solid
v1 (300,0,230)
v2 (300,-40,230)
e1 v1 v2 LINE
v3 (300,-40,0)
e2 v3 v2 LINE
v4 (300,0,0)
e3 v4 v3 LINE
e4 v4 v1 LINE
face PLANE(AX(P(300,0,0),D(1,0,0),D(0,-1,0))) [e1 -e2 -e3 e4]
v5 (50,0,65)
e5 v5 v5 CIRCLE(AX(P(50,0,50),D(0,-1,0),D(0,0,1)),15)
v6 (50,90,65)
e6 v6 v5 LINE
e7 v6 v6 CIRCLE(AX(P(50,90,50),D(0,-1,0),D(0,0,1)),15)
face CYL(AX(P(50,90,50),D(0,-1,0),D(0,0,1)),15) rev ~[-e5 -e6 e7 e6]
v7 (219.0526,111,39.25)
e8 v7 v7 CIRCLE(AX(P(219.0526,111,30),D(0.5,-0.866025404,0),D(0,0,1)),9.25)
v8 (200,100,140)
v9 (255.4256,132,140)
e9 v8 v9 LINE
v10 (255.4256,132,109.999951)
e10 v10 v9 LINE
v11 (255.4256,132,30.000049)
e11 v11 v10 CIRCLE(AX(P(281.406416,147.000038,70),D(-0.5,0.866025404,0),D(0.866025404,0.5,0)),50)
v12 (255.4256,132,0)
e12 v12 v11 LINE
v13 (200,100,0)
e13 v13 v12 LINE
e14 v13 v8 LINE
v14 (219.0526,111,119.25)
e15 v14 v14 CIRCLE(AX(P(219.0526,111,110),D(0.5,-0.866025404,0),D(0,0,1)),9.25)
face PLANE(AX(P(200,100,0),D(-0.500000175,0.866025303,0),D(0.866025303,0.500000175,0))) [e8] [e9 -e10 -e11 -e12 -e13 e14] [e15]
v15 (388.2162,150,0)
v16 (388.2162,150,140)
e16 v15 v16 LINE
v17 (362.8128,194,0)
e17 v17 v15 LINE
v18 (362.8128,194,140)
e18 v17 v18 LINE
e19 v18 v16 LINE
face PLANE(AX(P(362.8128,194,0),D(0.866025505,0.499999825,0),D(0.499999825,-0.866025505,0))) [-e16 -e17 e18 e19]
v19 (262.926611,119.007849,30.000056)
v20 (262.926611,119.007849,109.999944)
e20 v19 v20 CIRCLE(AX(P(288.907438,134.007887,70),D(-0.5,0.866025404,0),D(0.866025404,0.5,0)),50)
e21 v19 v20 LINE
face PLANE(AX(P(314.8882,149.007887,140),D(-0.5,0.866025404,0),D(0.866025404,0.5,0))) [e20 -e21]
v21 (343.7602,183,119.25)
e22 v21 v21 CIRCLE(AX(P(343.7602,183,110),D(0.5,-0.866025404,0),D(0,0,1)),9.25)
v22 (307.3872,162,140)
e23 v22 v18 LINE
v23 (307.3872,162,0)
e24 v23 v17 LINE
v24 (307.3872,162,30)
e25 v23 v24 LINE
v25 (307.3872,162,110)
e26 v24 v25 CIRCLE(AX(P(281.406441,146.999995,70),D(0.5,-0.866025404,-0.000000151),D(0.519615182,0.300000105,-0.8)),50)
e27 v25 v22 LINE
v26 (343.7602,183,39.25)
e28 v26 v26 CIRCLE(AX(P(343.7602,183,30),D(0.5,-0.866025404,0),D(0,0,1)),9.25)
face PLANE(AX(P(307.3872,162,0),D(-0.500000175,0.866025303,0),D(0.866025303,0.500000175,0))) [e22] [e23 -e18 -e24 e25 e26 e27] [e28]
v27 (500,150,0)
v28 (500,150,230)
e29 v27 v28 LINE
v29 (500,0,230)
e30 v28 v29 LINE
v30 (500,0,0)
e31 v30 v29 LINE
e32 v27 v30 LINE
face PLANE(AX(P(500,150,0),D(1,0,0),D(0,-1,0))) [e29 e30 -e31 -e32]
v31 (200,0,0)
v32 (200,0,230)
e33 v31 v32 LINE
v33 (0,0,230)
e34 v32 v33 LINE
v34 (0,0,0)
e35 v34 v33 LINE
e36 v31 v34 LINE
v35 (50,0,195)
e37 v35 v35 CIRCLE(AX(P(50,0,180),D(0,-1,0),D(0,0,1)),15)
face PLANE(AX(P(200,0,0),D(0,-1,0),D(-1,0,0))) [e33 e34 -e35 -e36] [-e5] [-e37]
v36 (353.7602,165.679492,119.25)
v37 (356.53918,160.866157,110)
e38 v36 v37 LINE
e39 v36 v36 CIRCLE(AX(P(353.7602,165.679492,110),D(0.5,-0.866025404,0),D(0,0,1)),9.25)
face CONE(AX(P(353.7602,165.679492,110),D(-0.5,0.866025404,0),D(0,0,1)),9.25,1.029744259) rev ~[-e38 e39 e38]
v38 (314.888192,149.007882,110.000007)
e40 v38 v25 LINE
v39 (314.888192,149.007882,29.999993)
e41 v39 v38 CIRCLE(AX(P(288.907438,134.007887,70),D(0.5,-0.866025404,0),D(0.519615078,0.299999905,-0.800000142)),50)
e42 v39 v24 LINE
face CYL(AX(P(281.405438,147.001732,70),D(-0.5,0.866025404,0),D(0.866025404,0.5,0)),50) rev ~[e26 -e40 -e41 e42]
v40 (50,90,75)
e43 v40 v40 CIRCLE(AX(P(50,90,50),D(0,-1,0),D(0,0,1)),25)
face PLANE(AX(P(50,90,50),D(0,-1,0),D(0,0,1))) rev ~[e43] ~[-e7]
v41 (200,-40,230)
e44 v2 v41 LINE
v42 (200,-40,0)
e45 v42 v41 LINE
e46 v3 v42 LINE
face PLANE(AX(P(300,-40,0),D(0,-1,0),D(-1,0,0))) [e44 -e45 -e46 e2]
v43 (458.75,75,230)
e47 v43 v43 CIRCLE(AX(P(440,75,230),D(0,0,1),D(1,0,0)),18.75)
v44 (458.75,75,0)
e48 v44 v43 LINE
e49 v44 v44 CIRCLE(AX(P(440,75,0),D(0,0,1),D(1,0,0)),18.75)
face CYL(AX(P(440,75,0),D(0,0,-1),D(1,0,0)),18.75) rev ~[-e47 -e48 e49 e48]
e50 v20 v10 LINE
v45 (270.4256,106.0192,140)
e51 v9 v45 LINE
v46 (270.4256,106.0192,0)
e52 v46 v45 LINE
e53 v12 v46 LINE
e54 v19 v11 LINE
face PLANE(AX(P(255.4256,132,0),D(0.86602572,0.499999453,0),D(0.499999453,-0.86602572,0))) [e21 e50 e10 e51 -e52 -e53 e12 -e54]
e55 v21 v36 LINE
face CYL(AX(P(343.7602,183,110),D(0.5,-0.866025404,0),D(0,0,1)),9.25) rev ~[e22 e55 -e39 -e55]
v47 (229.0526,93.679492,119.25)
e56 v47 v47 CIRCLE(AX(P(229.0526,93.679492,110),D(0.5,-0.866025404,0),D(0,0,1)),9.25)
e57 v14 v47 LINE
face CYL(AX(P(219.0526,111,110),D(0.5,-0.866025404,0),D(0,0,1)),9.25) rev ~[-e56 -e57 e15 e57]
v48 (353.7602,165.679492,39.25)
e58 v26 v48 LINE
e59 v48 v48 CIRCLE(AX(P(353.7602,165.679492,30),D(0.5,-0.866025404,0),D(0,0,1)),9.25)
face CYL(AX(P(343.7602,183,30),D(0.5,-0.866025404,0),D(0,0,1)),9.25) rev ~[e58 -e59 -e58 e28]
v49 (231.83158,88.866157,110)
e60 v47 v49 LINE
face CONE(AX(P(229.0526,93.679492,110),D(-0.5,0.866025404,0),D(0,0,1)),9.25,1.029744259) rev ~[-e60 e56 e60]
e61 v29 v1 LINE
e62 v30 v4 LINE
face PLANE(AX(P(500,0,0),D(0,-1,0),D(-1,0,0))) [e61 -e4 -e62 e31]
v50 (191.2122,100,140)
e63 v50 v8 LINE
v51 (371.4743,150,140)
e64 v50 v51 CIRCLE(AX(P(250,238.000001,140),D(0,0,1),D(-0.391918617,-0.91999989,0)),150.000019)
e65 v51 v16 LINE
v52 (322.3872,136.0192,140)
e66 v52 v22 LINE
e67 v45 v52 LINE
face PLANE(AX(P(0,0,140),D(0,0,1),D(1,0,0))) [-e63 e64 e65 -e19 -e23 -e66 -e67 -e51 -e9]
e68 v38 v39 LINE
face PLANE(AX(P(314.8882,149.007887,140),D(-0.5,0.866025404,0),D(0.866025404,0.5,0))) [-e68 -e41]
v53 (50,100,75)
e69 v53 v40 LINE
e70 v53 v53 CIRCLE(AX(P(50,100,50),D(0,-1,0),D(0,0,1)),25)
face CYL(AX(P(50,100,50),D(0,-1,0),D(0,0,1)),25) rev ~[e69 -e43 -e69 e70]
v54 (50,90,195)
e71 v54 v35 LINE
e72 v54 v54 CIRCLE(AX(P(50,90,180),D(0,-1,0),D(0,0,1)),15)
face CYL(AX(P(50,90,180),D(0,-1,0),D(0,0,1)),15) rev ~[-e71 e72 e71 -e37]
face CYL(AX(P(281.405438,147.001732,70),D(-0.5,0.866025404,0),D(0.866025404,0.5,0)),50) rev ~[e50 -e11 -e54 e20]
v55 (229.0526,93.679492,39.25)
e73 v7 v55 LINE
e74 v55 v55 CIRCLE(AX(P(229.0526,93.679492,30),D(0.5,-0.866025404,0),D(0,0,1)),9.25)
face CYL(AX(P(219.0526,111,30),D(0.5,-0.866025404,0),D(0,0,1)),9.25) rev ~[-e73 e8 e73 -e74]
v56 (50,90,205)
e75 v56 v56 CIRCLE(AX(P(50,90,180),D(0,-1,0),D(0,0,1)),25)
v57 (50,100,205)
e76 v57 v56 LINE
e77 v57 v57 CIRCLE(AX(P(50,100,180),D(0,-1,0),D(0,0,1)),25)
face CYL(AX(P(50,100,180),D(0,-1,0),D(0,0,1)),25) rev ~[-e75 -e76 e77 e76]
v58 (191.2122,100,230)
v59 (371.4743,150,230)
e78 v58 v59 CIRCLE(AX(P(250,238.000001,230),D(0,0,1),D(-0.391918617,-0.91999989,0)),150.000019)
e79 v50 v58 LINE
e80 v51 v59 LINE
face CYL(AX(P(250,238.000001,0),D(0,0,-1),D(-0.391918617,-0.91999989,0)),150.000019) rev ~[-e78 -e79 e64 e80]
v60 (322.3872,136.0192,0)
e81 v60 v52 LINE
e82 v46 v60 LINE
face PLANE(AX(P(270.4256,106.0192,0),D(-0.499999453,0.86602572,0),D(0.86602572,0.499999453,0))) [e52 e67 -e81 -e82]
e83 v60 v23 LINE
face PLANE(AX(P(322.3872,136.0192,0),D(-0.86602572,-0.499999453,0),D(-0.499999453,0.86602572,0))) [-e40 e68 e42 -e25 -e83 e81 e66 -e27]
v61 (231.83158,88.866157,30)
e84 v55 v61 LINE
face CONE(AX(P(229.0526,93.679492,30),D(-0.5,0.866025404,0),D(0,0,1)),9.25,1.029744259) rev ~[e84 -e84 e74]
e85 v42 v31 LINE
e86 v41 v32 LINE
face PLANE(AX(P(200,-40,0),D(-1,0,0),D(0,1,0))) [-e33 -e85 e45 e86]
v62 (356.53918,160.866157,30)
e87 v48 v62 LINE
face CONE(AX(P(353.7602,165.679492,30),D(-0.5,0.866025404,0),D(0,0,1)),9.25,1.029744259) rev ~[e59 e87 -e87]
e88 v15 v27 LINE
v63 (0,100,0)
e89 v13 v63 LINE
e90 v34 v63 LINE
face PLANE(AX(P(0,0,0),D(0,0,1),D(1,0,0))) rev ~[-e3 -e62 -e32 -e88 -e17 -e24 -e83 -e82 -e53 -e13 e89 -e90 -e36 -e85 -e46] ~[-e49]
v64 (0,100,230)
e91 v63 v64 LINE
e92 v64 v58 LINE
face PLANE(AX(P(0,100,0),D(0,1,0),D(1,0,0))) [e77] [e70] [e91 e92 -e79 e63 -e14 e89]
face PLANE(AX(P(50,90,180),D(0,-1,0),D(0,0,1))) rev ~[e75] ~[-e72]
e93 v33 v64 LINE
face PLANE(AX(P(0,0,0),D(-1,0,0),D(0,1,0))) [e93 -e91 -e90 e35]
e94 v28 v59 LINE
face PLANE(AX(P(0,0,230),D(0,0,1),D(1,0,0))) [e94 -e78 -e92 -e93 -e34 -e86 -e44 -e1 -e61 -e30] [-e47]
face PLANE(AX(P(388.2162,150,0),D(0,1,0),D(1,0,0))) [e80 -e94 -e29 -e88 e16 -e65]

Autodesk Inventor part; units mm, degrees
ref_plane "YZ Plane" through (0, 0, 0) normal (1, 0, 0) x (0, 1, 0)
ref_plane "XZ Plane" through (0, 0, 0) normal (0, 1, 0) x (-1, 0, 0)
ref_plane "XY Plane" through (0, 0, 0) normal (0, 0, 1) x (1, 0, 0)
sketch "Sketch1" plane through (0, 0, 0) normal (0, 0, 1) x (1, 0, 0)
  line L0 (0, 0) -> (0, 100)
  line L1 (0, 100) -> (200, 100)
  line L2 (500, 150) -> (500, 0)
  line L3 (500, 0) -> (300, 0)
  line L4 (300, 0) -> (300, -40)
  line L5 (300, -40) -> (200, -40)
  line L6 (200, -40) -> (200, 0)
  line L7 (200, 0) -> (0, 0)
  circle A0 centre (440, 75) radius 18.75
  arc A1 (191.2122, 100) -> (371.4743, 150) centre (250, 238) ccw
  line L8 (371.4743, 150) -> (500, 150)
  line L9 (362.8128, 194) -> (388.2162, 150)
  line L10 (255.4256, 132) -> (270.4256, 106.0192)
  line L11 (270.4256, 106.0192) -> (322.3872, 136.0192)
  line L12 (322.3872, 136.0192) -> (307.3872, 162)
  line L13 (200, 100) -> (255.4256, 132)
  line L14 (307.3872, 162) -> (362.8128, 194)
  dimension "d0" = 100
  dimension "d2" = 200
  dimension "d3" = 100
  dimension "d4" = 40
  dimension "d5" = 150
  dimension "d6" = 75
  dimension "d7" = 60
  dimension "d8" = 37.5
  dimension "d10" = 250
  dimension "d11" = 200
  dimension "d12" = 138
  dimension "d13" = 150
  dimension "d15" = 188
  dimension "d16" = 60
  dimension "d17" = 30
  dimension "d18" = 30
  dimension "d19" = 500
extrude "Extrusion1" add sketch "Sketch1" along normal blind 230 contours L0 L1 A1 L8 L2 L3 L4 L5 L6 L7
extrude "Extrusion2" add sketch "Sketch1" along normal blind 140 contours L1 L13 L10 L11 L12 L14 L9 L8 A1
sketch "Sketch2" plane through (0, 100, 230) normal (0, 1, 0) x (1, 0, 0)
  line L0 (0, 230) -> (0, 0) projected
  line L1 (50, 180) -> (50, 50) construction
  point P0 (50, 115)
  point P1 (0, 115)
  dimension "d24" = 50
  dimension "d25" = 130
hole "Hole1" at (50, 100, 50) at (50, 100, 180) direction (0, -1, 0) diameter 30 depth 100 counterbore diameter 50 counterbore depth 10
sketch "Sketch3" plane through (307.3872, 162, 140) normal (-0.5, 0.8660254, 0) x (0.8660254, 0.5, 0)
  line L0 (64, 140) -> (64, 0) projected
  line L1 (-60, 140) -> (-124, 140) projected
  line L2 (-124, 140) -> (-124, 0) projected
  line L3 (-60, 0) -> (-124, 0) projected
  line L4 (-60, 140) -> (-60, 0) projected
  line L5 (0, 140) -> (-60, 140) projected
  line L6 (-60, 140) -> (-60, 0) projected
  line L7 (0, 0) -> (-60, 0) projected
  line L8 (0, 140) -> (0, 0) projected
  circle A0 centre (-30, 70) radius 50
  line L9 (-30, 0) -> (-30, 140) construction
  line L10 (64, 70) -> (-124, 70) construction
  point P0 (-347.2051, 140)
  point P1 (-102, 110)
  point P2 (-102, 30)
  point P3 (42, 110)
  point P4 (42, 30)
  dimension "d33" = 100
  dimension "d34" = 80
hole "Hole2" at (219.0526, 111, 30) at (219.0526, 111, 110) at (343.7602, 183, 30) at (343.7602, 183, 110) direction (0.5, -0.8660254, 0) diameter 18.5 depth 20 tip angle 118
extrude "Extrusion3" cut sketch "Sketch3" against normal blind 15 contours A0 L8 L4 | L4 A0 | A0 L8
properties part number "b3"
